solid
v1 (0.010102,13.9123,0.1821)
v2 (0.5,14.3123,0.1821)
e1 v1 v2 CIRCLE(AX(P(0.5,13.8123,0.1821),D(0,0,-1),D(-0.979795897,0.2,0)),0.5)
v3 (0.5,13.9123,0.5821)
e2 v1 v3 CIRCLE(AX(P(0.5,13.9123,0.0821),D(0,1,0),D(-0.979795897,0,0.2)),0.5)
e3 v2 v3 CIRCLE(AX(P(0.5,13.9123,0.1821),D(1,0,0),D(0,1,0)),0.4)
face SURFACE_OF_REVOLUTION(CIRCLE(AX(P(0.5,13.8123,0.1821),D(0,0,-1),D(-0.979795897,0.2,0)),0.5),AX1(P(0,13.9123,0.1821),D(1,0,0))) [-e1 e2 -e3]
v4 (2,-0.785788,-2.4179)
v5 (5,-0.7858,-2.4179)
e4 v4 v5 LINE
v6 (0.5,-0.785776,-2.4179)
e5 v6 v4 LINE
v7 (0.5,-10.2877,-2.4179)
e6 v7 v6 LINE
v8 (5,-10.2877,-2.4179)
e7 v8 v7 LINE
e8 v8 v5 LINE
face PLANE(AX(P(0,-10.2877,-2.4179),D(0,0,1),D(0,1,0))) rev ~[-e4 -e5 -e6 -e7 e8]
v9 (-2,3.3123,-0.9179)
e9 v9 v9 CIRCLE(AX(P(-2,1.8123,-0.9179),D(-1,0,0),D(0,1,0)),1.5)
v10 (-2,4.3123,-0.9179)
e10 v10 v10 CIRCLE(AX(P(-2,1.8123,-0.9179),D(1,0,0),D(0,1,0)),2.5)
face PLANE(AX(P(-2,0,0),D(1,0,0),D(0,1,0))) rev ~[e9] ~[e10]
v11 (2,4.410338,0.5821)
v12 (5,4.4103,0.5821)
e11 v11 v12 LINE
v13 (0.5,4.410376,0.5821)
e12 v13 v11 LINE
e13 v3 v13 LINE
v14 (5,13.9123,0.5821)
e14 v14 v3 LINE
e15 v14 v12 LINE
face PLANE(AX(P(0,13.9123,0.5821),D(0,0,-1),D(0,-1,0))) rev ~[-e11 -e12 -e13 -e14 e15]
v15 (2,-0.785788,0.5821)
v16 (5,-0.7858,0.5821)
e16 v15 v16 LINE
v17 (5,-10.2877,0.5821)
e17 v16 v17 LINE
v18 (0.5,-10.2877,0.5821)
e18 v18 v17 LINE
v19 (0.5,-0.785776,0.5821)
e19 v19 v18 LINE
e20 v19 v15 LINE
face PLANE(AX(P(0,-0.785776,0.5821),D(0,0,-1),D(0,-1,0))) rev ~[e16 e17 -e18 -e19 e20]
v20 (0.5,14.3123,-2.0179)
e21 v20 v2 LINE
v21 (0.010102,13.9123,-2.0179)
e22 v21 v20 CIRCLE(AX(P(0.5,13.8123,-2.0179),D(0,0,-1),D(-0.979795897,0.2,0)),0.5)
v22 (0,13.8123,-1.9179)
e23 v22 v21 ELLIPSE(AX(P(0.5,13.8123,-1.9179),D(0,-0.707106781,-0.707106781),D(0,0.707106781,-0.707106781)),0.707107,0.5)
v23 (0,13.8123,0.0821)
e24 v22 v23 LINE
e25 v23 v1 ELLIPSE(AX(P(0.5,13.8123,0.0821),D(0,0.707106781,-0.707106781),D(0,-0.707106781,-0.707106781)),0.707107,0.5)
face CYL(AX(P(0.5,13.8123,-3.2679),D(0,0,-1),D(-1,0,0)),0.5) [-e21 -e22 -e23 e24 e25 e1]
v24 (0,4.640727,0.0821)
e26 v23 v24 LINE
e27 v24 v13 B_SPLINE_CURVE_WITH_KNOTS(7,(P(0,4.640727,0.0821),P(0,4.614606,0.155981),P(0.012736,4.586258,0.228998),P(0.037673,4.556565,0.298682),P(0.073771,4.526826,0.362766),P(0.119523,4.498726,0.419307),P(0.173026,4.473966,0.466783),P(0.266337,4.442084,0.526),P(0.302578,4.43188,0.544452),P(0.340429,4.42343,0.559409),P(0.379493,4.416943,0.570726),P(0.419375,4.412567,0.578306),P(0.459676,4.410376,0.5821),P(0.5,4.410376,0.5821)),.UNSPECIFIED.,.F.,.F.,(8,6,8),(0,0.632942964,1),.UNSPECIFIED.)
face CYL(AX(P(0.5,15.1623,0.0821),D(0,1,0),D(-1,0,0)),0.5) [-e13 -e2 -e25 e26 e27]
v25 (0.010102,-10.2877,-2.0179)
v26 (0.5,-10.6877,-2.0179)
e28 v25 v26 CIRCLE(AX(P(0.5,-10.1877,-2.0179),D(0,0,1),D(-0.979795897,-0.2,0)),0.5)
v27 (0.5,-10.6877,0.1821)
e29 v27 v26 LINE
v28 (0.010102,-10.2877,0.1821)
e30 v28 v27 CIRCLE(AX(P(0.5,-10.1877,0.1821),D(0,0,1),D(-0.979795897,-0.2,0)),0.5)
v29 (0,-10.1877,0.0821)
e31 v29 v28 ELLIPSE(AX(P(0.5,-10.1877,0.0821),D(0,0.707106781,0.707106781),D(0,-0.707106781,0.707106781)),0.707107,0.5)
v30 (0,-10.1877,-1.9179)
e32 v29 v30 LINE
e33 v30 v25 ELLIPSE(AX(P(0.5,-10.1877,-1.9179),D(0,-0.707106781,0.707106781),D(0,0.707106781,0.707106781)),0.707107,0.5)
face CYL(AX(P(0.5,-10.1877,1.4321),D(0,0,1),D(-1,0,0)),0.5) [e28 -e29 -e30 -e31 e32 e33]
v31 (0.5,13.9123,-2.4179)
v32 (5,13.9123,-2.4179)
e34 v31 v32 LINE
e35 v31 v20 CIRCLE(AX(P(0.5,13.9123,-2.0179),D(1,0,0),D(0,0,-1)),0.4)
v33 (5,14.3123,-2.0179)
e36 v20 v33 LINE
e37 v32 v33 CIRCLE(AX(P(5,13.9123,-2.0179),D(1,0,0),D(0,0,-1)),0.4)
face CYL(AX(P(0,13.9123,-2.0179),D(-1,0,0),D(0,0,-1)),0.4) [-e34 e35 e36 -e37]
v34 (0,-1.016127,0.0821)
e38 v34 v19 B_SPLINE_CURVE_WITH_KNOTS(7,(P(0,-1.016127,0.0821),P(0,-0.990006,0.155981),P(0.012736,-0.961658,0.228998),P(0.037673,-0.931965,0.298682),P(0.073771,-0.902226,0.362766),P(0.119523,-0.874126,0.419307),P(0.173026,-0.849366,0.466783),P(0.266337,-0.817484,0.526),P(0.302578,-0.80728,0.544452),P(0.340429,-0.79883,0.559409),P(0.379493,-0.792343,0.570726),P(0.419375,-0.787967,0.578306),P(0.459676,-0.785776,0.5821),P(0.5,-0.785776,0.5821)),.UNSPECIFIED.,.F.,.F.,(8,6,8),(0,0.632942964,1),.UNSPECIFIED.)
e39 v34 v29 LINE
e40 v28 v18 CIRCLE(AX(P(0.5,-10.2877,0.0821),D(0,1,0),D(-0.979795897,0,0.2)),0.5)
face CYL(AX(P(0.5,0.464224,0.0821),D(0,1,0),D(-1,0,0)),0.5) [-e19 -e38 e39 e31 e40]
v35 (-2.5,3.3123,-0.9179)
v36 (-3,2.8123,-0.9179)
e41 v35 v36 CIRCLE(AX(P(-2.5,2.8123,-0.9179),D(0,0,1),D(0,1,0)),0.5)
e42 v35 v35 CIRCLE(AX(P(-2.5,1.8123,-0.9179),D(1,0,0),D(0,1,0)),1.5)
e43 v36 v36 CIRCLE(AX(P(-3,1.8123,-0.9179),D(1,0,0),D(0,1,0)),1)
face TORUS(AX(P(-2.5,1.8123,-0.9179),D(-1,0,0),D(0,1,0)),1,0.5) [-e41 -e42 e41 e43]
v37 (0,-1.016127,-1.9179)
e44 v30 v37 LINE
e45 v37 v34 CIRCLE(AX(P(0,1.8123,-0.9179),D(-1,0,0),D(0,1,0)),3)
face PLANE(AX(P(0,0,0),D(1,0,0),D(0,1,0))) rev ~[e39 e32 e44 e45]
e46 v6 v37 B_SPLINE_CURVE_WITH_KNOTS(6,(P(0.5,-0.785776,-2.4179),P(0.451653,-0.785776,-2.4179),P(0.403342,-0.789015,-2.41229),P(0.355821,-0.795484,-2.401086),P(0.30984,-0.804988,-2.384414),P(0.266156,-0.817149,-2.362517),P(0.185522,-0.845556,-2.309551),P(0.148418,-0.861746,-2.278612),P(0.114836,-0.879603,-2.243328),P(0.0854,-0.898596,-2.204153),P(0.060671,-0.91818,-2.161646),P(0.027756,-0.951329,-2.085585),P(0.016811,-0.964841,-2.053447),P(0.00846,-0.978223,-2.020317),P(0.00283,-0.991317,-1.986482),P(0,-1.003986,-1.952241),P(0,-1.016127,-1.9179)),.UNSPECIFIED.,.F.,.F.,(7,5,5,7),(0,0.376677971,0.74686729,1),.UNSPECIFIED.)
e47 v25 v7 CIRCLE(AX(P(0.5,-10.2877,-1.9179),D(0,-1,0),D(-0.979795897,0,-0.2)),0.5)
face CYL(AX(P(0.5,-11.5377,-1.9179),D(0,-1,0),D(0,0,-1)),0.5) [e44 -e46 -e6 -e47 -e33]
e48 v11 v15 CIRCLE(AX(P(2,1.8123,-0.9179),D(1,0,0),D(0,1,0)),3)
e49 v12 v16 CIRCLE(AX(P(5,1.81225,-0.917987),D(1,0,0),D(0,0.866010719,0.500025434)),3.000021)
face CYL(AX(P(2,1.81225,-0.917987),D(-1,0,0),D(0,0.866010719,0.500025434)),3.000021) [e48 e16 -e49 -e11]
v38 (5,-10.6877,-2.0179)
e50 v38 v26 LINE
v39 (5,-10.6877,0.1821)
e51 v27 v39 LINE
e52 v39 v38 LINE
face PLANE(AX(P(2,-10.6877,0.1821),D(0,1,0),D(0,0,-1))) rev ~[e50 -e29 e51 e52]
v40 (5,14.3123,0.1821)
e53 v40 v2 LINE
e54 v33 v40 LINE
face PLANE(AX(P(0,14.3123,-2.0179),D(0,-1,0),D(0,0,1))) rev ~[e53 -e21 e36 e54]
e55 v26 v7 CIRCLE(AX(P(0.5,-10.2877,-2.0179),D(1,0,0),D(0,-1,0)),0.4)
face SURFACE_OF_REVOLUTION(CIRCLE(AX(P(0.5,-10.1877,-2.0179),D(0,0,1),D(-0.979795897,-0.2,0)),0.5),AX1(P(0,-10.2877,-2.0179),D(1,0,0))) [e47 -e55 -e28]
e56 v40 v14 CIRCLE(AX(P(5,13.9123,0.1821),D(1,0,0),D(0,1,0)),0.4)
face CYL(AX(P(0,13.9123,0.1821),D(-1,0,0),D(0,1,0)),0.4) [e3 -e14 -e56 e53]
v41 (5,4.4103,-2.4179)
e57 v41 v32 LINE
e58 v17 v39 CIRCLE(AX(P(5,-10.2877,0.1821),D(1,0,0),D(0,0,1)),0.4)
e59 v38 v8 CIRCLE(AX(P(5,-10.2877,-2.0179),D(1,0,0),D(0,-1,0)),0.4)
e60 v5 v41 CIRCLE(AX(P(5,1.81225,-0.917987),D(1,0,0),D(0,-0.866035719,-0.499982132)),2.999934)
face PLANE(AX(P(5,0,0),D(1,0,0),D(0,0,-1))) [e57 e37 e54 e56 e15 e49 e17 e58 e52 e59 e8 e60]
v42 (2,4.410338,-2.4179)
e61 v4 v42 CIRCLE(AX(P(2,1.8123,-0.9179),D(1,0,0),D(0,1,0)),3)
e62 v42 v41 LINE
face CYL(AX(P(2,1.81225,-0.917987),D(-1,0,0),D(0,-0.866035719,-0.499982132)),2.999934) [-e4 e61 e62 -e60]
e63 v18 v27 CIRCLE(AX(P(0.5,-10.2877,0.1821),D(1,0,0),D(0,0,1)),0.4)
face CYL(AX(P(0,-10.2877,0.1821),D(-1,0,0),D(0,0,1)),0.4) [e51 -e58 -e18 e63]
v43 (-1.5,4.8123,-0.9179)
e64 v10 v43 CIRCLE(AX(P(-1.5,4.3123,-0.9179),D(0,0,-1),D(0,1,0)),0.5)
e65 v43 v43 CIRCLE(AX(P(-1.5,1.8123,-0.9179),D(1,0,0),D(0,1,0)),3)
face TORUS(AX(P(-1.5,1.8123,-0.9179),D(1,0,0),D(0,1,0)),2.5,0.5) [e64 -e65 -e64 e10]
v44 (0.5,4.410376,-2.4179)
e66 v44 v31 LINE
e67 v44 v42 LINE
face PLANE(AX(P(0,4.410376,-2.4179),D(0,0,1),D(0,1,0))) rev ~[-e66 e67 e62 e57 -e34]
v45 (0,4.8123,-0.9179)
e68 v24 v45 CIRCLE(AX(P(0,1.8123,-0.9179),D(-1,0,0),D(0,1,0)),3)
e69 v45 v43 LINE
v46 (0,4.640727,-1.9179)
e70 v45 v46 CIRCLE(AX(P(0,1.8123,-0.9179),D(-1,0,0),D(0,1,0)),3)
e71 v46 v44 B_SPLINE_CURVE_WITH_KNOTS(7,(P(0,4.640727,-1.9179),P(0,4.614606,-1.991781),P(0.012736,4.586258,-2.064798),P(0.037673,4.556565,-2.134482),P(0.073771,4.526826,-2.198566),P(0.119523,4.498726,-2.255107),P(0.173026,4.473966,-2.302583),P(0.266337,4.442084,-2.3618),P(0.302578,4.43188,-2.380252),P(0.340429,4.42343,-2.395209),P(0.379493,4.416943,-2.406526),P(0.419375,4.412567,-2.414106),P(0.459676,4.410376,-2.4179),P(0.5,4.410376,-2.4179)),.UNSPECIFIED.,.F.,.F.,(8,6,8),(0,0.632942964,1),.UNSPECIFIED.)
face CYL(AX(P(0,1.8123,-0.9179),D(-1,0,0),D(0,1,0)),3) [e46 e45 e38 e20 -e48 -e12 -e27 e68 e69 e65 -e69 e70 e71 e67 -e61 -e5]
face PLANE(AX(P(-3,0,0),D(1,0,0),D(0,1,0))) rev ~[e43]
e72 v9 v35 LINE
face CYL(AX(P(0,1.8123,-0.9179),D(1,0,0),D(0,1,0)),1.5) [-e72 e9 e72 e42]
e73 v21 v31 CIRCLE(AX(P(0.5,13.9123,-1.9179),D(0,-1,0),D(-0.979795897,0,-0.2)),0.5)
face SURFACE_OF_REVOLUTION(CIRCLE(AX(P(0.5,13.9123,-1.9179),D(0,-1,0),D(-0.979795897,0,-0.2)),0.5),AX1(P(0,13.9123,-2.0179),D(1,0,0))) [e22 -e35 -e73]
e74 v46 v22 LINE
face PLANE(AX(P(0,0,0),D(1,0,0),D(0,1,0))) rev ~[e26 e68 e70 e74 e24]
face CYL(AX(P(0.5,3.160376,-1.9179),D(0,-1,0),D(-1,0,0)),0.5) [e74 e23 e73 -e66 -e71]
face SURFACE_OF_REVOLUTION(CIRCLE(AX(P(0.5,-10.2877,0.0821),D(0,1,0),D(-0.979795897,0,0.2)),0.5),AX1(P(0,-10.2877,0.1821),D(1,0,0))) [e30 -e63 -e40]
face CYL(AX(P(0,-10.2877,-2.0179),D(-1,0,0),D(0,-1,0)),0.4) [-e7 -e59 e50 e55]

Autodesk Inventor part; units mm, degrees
ref_plane "YZ Plane" through (0, 0, 0) normal (1, 0, 0) x (0, 1, 0)
ref_plane "XZ Plane" through (0, 0, 0) normal (0, 1, 0) x (-1, 0, 0)
ref_plane "XY Plane" through (0, 0, 0) normal (0, 0, 1) x (1, 0, 0)
sketch "Sketch1" plane through (0, 0, 0) normal (1, 0, 0) x (0, 1, 0)
  line L0 (13.9123, 0.5821) -> (-10.2877, 0.5821)
  line L1 (-10.6877, 0.1821) -> (-10.6877, -2.0179)
  line L2 (-10.2877, -2.4179) -> (13.9123, -2.4179)
  line L3 (14.3123, -2.0179) -> (14.3123, 0.1821)
  arc A0 (13.9123, -2.4179) -> (14.3123, -2.0179) centre (13.9123, -2.0179) ccw
  arc A1 (14.3123, 0.1821) -> (13.9123, 0.5821) centre (13.9123, 0.1821) ccw
  arc A2 (-10.6877, -2.0179) -> (-10.2877, -2.4179) centre (-10.2877, -2.0179) ccw
  arc A3 (-10.2877, 0.5821) -> (-10.6877, 0.1821) centre (-10.2877, 0.1821) ccw
  line L4 (14.3123, -4.8123) -> (1.8123, -4.8123) construction
  line L5 (14.3123, 0.1821) -> (14.3123, -23.1695) construction
  circle A4 centre (1.8123, -0.9179) radius 3
  circle A5 centre (1.8123, -0.9179) radius 1.5
  point P0 (0, 0)
  point P1 (-10.6877, -2.4179)
  point P2 (-10.6877, 0.5821)
  point P3 (14.3123, -2.4179)
  point P4 (4.4103, 0.5821)
  point P5 (-0.7858, 0.5821)
  point P6 (-0.7858, -2.4179)
  point P7 (4.4103, -2.4179)
  dimension "d1" = 3
  dimension "d2" = 25
  dimension "d3" = 0.4
  dimension "d4" = 12.5
  dimension "d5" = 6
extrude "Extrusion1" add sketch "Sketch1" along normal blind 2
extrude "Extrusion2" add sketch "Sketch1" against normal blind 2 contours A4 L2 A5 L0 | L0 A4 | A5 L2 A4 L0 | A5 | L2 A4
extrude "Extrusion3" add sketch "Sketch1" against normal blind 3 contours A5
fillet "Fillet1" radius 0.5 1 edges at (-3, 0.3123, -0.9179)
fillet "Fillet2" radius 0.5 1 edges at (-2, -1.1877, -0.9179)
fillet "Fillet3" radius 0.5 10 edges at (0, 14.1951, 0.465) (0, 14.3123, -0.9179) (0, 14.1951, -2.3007) (0, 9.1613, -2.4179) (0, 9.1613, 0.5821) (0, -10.5706, 0.465) (0, -10.6877, -0.9179) (0, -10.5706, -2.3007) (0, -5.5368, -2.4179) (0, -5.5368, 0.5821)
sketch "Sketch2" plane through (2, 0, 0) normal (1, 0, 0) x (0, 0, -1)
  line L0 (-0.5821, 13.9123) -> (-0.5821, 4.4103) projected
  arc A0 (-0.5821, 4.4103) -> (-0.5821, -0.7858) centre (0.9179, 1.8123) ccw projected
  line L1 (-0.5821, -0.7858) -> (-0.5821, -10.2877) projected
  arc A1 (-0.5821, -10.2877) -> (-0.1821, -10.6877) centre (-0.1821, -10.2877) ccw projected
  line L2 (-0.1821, -10.6877) -> (2.0179, -10.6877) projected
  arc A2 (2.0179, -10.6877) -> (2.4179, -10.2877) centre (2.0179, -10.2877) ccw projected
  line L3 (2.4179, -10.2877) -> (2.4179, -0.7858) projected
  arc A3 (2.4179, -0.7858) -> (2.4179, 4.4103) centre (0.9179, 1.8123) ccw projected
  line L4 (2.4179, 4.4103) -> (2.4179, 13.9123) projected
  arc A4 (2.4179, 13.9123) -> (2.0179, 14.3123) centre (2.0179, 13.9123) ccw projected
  line L5 (2.0179, 14.3123) -> (-0.1821, 14.3123) projected
  arc A5 (-0.1821, 14.3123) -> (-0.5821, 13.9123) centre (-0.1821, 13.9123) ccw projected
  point P0 (0, 0)
extrude "Extrusion4" add sketch "Sketch2" along normal blind 3
properties part number "torque"
